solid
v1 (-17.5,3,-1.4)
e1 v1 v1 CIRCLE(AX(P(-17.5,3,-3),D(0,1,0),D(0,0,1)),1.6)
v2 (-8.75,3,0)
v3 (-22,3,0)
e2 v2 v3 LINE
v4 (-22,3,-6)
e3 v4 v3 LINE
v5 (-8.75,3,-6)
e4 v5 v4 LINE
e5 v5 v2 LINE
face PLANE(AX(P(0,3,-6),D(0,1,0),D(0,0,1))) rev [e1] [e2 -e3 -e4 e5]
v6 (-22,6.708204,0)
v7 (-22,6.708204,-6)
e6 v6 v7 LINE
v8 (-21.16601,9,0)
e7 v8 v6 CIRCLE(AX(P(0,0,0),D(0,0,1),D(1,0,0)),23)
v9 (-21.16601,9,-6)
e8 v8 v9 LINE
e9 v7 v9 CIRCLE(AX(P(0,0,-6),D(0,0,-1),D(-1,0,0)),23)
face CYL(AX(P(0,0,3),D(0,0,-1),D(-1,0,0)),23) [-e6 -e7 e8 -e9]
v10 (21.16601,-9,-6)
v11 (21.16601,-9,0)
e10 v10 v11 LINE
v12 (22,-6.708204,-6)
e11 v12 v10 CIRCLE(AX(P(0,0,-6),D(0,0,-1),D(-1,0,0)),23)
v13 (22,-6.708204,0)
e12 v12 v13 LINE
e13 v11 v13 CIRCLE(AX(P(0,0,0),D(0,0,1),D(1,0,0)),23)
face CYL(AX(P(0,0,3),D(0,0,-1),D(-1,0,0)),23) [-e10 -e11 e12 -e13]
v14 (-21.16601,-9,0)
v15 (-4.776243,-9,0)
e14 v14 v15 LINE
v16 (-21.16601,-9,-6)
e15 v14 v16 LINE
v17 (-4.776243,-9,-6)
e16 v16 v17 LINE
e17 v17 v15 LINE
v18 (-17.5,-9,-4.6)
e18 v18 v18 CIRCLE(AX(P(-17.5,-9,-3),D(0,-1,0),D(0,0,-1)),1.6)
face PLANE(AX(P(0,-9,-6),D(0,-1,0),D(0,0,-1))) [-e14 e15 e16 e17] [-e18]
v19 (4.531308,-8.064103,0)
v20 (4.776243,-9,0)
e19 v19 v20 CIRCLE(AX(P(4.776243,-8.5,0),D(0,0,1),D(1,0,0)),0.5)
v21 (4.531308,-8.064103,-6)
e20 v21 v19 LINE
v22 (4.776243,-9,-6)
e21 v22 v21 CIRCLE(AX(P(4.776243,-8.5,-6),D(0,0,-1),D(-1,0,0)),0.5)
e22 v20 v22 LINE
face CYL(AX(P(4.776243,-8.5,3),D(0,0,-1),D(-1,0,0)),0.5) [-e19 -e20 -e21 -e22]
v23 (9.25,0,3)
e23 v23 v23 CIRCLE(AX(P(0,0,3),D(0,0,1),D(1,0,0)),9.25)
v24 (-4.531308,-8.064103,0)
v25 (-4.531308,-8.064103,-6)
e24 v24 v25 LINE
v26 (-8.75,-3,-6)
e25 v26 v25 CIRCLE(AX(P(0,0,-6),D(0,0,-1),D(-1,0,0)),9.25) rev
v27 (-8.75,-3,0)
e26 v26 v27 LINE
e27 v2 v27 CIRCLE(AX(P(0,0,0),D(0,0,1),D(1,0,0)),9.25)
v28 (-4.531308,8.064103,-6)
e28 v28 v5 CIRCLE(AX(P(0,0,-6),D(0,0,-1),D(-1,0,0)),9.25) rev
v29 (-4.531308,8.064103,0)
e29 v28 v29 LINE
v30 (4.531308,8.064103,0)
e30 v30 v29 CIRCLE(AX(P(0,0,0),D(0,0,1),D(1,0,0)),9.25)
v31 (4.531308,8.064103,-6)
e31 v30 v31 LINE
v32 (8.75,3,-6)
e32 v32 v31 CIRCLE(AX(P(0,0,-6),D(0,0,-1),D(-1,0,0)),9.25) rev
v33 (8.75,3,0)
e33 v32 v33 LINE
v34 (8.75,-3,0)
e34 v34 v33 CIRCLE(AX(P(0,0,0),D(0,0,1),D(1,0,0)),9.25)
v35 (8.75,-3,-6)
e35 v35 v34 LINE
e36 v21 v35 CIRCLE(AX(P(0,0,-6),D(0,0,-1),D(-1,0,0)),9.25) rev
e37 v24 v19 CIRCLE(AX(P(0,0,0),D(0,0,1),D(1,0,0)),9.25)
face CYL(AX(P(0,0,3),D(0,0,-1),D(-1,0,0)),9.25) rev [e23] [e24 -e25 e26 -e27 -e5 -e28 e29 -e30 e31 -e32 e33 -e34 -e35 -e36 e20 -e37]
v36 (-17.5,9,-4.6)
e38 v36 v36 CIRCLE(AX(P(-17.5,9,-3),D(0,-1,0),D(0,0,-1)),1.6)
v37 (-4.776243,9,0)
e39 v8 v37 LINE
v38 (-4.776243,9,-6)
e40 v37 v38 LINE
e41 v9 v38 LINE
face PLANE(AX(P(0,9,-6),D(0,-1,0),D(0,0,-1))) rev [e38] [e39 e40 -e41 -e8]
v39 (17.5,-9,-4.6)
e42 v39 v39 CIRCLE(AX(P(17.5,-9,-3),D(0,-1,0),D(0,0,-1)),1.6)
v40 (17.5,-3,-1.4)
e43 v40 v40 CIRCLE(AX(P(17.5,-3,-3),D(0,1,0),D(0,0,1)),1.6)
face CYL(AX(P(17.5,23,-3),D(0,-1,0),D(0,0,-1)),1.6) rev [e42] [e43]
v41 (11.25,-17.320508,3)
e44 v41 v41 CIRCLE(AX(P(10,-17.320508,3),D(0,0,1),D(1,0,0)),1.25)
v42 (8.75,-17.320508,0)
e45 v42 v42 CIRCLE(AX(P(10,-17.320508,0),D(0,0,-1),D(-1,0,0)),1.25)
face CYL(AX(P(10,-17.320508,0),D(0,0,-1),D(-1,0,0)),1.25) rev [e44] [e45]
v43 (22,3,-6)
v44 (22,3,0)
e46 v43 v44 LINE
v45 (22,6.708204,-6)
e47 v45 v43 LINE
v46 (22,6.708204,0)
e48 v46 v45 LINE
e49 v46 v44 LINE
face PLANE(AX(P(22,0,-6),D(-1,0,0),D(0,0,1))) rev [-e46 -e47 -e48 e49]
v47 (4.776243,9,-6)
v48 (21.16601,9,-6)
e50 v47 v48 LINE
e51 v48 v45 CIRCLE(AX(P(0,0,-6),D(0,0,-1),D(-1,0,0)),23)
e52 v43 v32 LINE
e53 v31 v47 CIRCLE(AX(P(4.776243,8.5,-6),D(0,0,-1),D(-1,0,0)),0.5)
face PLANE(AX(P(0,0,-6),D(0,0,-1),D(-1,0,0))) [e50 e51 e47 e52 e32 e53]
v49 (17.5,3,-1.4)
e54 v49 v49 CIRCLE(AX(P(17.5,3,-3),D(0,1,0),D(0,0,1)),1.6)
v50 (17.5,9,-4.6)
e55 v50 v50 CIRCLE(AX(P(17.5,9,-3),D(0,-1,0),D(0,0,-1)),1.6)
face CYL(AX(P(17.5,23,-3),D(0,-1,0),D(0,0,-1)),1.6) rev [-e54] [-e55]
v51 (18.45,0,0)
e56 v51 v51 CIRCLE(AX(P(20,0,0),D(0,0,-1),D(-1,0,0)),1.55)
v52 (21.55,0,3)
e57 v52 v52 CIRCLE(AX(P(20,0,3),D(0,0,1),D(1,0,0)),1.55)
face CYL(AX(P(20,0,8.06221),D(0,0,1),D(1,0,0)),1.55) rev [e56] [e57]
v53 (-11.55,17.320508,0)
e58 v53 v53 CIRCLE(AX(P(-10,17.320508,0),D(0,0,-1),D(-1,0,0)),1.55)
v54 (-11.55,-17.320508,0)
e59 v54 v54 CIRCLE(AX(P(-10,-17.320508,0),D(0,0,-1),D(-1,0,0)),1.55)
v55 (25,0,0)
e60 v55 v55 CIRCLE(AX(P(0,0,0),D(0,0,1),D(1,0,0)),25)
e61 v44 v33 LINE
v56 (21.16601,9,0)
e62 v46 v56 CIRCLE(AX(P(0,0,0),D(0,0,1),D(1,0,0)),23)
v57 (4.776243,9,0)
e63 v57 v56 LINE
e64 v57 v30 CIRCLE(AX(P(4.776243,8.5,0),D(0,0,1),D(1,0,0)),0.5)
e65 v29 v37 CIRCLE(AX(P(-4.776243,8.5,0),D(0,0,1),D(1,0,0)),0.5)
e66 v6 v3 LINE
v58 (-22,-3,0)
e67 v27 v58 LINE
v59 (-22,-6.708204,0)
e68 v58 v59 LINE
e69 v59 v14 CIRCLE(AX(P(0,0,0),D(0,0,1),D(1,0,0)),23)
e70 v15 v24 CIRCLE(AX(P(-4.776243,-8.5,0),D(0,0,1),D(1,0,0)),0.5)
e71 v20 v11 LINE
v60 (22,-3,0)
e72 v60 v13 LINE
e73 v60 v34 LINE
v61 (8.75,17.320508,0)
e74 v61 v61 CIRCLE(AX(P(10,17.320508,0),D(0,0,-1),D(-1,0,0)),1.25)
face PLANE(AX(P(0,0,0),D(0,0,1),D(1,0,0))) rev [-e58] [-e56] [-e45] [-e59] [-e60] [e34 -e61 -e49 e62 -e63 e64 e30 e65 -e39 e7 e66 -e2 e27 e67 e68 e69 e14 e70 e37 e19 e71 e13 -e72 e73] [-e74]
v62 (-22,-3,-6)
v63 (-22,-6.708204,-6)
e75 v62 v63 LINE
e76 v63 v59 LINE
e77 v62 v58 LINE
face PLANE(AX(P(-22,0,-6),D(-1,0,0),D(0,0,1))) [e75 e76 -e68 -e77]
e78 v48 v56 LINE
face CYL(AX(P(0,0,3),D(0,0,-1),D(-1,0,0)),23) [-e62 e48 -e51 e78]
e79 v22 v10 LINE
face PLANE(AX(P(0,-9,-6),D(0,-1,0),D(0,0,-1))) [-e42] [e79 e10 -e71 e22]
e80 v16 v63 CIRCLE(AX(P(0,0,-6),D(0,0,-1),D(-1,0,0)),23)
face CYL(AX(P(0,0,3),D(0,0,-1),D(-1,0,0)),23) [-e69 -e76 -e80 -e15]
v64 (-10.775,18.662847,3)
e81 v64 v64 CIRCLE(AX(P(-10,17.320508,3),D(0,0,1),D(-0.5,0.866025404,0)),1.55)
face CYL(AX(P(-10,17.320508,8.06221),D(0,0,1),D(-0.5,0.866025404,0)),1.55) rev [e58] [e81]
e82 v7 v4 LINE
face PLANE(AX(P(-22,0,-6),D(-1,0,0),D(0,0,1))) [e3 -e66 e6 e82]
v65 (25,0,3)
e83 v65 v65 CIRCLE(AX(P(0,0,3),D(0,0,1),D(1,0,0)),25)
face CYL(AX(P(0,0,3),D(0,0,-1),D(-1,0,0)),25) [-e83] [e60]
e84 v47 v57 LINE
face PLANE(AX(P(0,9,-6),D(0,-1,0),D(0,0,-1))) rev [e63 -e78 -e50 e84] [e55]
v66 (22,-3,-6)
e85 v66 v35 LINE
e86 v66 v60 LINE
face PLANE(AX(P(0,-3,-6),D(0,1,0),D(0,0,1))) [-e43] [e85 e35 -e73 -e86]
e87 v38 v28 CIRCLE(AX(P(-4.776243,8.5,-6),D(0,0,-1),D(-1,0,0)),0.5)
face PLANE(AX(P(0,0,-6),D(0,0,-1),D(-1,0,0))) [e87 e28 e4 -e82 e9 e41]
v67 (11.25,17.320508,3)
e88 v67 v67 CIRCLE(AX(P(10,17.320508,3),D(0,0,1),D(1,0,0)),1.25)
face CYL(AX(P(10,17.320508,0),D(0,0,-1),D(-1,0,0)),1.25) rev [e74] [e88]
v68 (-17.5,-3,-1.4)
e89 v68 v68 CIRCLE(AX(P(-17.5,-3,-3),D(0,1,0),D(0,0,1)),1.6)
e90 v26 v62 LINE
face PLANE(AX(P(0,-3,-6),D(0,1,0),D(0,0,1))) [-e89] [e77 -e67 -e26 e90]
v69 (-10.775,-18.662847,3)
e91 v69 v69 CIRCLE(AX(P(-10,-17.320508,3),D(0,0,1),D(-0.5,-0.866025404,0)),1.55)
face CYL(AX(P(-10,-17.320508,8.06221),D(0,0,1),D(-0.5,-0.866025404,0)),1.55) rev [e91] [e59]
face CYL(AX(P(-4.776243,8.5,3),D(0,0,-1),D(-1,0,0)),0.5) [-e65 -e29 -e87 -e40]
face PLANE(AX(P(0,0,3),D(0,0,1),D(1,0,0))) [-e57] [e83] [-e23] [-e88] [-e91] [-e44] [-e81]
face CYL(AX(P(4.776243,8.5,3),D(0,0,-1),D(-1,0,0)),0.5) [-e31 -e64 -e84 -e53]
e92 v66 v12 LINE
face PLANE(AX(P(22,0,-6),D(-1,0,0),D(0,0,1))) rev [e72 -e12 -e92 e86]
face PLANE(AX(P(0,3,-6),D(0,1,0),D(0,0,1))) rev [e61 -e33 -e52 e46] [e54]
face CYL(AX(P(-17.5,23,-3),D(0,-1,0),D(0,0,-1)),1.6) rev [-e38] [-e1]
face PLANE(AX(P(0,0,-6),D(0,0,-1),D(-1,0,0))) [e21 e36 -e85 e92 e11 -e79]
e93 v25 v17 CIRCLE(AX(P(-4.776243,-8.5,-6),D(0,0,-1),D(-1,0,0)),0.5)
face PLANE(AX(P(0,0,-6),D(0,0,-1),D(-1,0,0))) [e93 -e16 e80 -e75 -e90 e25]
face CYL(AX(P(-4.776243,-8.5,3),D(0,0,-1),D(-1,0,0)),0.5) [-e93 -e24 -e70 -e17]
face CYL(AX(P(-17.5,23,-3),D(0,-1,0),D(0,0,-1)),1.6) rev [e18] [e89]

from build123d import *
from build123d.topology import SkipClean

# Parameters (mm, degrees)
SKETCH_1_R               = 23
SKETCH_1_R_2             = 9.25
EXTRUDE_1_DEPTH          = 3
EXTRUDE_START            = 6
EXTRUDE_2_DEPTH          = 6
SKETCH_3_R               = 1.6
CUT_EXTRUDE_1_DEPTH      = 40.862262856
FILLET_3_R               = 0.5
SKETCH_4_R               = 25
SKETCH_4_R_2             = 23
CUT_EXTRUDE_2_DEPTH      = 10
SKETCH_5_R               = 25
SKETCH_5_R_2             = 9.25
EXTRUDE_3_DEPTH          = 3
PATTERN_CIRCULAR_1_COUNT = 3
SKETCH_12_R              = 3
SKETCH_12_R_2            = 1.55
EXTRUDE_4_DEPTH          = 2
HOLE_WIZARD_M3_1_D       = 2.5
HOLE_WIZARD_M3_1_DEPTH   = 12.5
HOLE_WIZARD_M3_1_TIP     = 0.751075774
SKETCH_16_R              = 3
SKETCH_16_R_2            = 1.55
EXTRUDE_5_DEPTH          = 3


with BuildPart() as part:
    # 草图1 → 凸台-拉伸1 (new body)
    with BuildSketch(Plane.XY):
        Circle(SKETCH_1_R)
        Circle(SKETCH_1_R_2, mode=Mode.SUBTRACT)
    extrude(amount=EXTRUDE_1_DEPTH)

    # 草图2 → 凸台-拉伸2 (add)
    with BuildSketch(Plane(origin=(0, 0, 0), x_dir=(-1, 0, 0), z_dir=(0, 0, -1)).offset(EXTRUDE_START)):
        with BuildLine():
            Line((22, 9), (2.136000936, 9))
            ThreePointArc((2.136000936, 9), (6.215002341, 6.851003277), (8.75, 3))
            Line((8.75, 3), (22, 3))
            Line((22, 3), (22, 9))
        make_face()
        with BuildLine():
            Line((-22, 9), (-22, 3))
            Line((-22, 3), (-8.75, 3))
            ThreePointArc((-8.75, 3), (-6.215002341, 6.851003277), (-2.136000936, 9))
            Line((-2.136000936, 9), (-22, 9))
        make_face()
        with BuildLine():
            Line((22, -3), (8.75, -3))
            ThreePointArc((8.75, -3), (6.215002341, -6.851003277), (2.136000936, -9))
            Line((2.136000936, -9), (22, -9))
            Line((22, -9), (22, -3))
        make_face()
        with BuildLine():
            Line((-22, -9), (-2.136000936, -9))
            ThreePointArc((-2.136000936, -9), (-6.215002341, -6.851003277), (-8.75, -3))
            Line((-8.75, -3), (-22, -3))
            Line((-22, -3), (-22, -9))
        make_face()
    extrude(amount=-EXTRUDE_2_DEPTH)

    # 草图3 → 切除-拉伸1 (cut, through all)
    with BuildSketch(Plane.XZ.offset(9)):
        with Locations(Location((-17.5, -3, 0), (0, 0, 270))):
            Circle(SKETCH_3_R)
        with Locations(Location((17.5, -3, 0), (0, 0, 270))):
            Circle(SKETCH_3_R)
    extrude(amount=-CUT_EXTRUDE_1_DEPTH, mode=Mode.SUBTRACT)

    # 圆角3
    # the kernel refuses this fillet: 0.5 mm, written as the material it takes off along each edge
    with BuildSketch(Plane(origin=(2.136000936, 9, -12.600605893), x_dir=(0.9314269408293101, -0.36392836368899956, 0), z_dir=(0, 0, 1))) as fillet_3_piece_1:
        with BuildLine():
            CenterArc((2.641157044, 0.49514561), FILLET_3_R, 111.34164725, 150.667889832)
            Line((2.459192862, 0.960859081), (0, 0))
            ThreePointArc((0, 0), (1.285826456, 0.089806207), (2.571652911, 0))
        make_face()
    extrude(amount=12.600605893, mode=Mode.SUBTRACT)
    with BuildSketch(Plane(origin=(-2.136000936, 9, -12.600605893), x_dir=(-0.931426940829308, -0.3639283636890051, 0), z_dir=(0, 0, 1))) as fillet_3_piece_2:
        with BuildLine():
            CenterArc((2.641157044, -0.49514561), FILLET_3_R, 97.990462918, 150.667889832)
            Line((2.459192862, -0.960859081), (0, 0))
            ThreePointArc((0, 0), (1.285826456, -0.089806207), (2.571652911, 0))
        make_face()
    extrude(amount=12.600605893, mode=Mode.SUBTRACT)
    with BuildSketch(Plane(origin=(-2.136000936, -9, -12.600605893), x_dir=(-1, 0, 0), z_dir=(0, 0, 1))) as fillet_3_piece_3:
        with BuildLine():
            CenterArc((2.640242357, -0.5), FILLET_3_R, 90, 150.667889832)
            ThreePointArc((2.395306804, -0.935897436), (1.230336428, -0.384300797), (0, 0))
            Line((0, 0), (2.640242357, 0))
        make_face()
    extrude(amount=12.600605893, mode=Mode.SUBTRACT)
    with BuildSketch(Plane(origin=(2.136000936, -9, -12.600605893), x_dir=(1, 0, 0), z_dir=(0, 0, 1))) as fillet_3_piece_4:
        with BuildLine():
            CenterArc((2.640242357, 0.5), FILLET_3_R, 119.332110168, 150.667889832)
            ThreePointArc((2.395306804, 0.935897436), (1.230336428, 0.384300797), (0, 0))
            Line((0, 0), (2.640242357, 0))
        make_face()
    extrude(amount=12.600605893, mode=Mode.SUBTRACT)

    # 草图4 → 切除-拉伸2 (cut)
    with SkipClean():  # the faces are left unmerged after this step: merging them gives an invalid solid
        with BuildSketch(Plane(origin=(0, 0, -6), x_dir=(-1, 0, 0), z_dir=(0, 0, -1))):
            Circle(SKETCH_4_R)
            with Locations(Location((0, 0, 0), (0, 0, 16.957426294))):
                Circle(SKETCH_4_R_2, mode=Mode.SUBTRACT)
        extrude(amount=-CUT_EXTRUDE_2_DEPTH, mode=Mode.SUBTRACT)
    add(part.part.scale(1), mode=Mode.REPLACE)  # the faces are merged on a copy

    # 草图5 → 凸台-拉伸3 (add)
    with SkipClean():  # the faces are left unmerged after this step: merging them gives an invalid solid
        with BuildSketch(Plane.XY):
            Circle(SKETCH_5_R)
            with Locations(Location((0, 0, 0), (0, 0, 198.924644416))):
                Circle(SKETCH_5_R_2, mode=Mode.SUBTRACT)
        extrude(amount=EXTRUDE_3_DEPTH)
    add(part.part.scale(1), mode=Mode.REPLACE)  # the faces are merged on a copy

    # 草图11 → 切除-旋转1 (revolve, cut)
    with BuildSketch(Plane(origin=(0, 0, 0), x_dir=(1, 0, 0), z_dir=(0, 1, 0))):
        Polygon((21.55, -3), (21.55, -1.45), (23, 0), (20, 0), (20, -3), align=None)
    cut_revolve_1 = revolve(axis=Axis((20, 0, 8.062210134), (0, 0, -1)), mode=Mode.SUBTRACT)

    # 阵列(圆周)1: 切除-旋转1 ×3 about axis
    pattern_circular_1_axis = Axis((0, 0, 0), (0, 0, 1))
    for i in range(1, PATTERN_CIRCULAR_1_COUNT):
        add(cut_revolve_1.rotate(pattern_circular_1_axis, i * 360 / PATTERN_CIRCULAR_1_COUNT), mode=Mode.SUBTRACT)

    # 草图12 → 凸台-拉伸4 (add)
    # profile 1 of 2: a face of its own
    with BuildSketch(Plane(origin=(0, 0, 0), x_dir=(-1, 0, 0), z_dir=(0, 0, -1))):
        with Locations((10, 17.320508076)):
            Circle(SKETCH_12_R)
        with Locations(Location((10, 17.320508076, 0), (0, 0, 60))):
            Circle(SKETCH_12_R_2, mode=Mode.SUBTRACT)
    # profile 2 of 2: a face of its own
    with BuildSketch(Plane(origin=(0, 0, 0), x_dir=(-1, 0, 0), z_dir=(0, 0, -1))):
        with Locations((10, -17.320508076)):
            Circle(SKETCH_12_R)
        with Locations(Location((10, -17.320508076, 0), (0, 0, 300))):
            Circle(SKETCH_12_R_2, mode=Mode.SUBTRACT)
    extrude(amount=-EXTRUDE_4_DEPTH)

    # M3 螺纹孔1
    with Locations(Plane(origin=(0, 0, 0), x_dir=(-1, 0, 0), z_dir=(0, 0, -1))):
        with Locations((-10, 17.320508076), (-10, -17.320508076)):
            Hole(HOLE_WIZARD_M3_1_D / 2, depth=HOLE_WIZARD_M3_1_DEPTH)
            with Locations((0, 0, -(HOLE_WIZARD_M3_1_DEPTH + HOLE_WIZARD_M3_1_TIP / 2))):  # 118° drill point
                Cone(0, HOLE_WIZARD_M3_1_D / 2, HOLE_WIZARD_M3_1_TIP, mode=Mode.SUBTRACT)

    # 草图16 → 凸台-拉伸5 (add)
    with BuildSketch(Plane(origin=(0, 0, 0), x_dir=(-1, 0, 0), z_dir=(0, 0, -1))):
        with Locations((-20, 0)):
            Circle(SKETCH_16_R)
        with Locations(Location((-20, 0, 0), (0, 0, 180))):
            Circle(SKETCH_16_R_2, mode=Mode.SUBTRACT)
    extrude(amount=-EXTRUDE_5_DEPTH)


solid = part.part
